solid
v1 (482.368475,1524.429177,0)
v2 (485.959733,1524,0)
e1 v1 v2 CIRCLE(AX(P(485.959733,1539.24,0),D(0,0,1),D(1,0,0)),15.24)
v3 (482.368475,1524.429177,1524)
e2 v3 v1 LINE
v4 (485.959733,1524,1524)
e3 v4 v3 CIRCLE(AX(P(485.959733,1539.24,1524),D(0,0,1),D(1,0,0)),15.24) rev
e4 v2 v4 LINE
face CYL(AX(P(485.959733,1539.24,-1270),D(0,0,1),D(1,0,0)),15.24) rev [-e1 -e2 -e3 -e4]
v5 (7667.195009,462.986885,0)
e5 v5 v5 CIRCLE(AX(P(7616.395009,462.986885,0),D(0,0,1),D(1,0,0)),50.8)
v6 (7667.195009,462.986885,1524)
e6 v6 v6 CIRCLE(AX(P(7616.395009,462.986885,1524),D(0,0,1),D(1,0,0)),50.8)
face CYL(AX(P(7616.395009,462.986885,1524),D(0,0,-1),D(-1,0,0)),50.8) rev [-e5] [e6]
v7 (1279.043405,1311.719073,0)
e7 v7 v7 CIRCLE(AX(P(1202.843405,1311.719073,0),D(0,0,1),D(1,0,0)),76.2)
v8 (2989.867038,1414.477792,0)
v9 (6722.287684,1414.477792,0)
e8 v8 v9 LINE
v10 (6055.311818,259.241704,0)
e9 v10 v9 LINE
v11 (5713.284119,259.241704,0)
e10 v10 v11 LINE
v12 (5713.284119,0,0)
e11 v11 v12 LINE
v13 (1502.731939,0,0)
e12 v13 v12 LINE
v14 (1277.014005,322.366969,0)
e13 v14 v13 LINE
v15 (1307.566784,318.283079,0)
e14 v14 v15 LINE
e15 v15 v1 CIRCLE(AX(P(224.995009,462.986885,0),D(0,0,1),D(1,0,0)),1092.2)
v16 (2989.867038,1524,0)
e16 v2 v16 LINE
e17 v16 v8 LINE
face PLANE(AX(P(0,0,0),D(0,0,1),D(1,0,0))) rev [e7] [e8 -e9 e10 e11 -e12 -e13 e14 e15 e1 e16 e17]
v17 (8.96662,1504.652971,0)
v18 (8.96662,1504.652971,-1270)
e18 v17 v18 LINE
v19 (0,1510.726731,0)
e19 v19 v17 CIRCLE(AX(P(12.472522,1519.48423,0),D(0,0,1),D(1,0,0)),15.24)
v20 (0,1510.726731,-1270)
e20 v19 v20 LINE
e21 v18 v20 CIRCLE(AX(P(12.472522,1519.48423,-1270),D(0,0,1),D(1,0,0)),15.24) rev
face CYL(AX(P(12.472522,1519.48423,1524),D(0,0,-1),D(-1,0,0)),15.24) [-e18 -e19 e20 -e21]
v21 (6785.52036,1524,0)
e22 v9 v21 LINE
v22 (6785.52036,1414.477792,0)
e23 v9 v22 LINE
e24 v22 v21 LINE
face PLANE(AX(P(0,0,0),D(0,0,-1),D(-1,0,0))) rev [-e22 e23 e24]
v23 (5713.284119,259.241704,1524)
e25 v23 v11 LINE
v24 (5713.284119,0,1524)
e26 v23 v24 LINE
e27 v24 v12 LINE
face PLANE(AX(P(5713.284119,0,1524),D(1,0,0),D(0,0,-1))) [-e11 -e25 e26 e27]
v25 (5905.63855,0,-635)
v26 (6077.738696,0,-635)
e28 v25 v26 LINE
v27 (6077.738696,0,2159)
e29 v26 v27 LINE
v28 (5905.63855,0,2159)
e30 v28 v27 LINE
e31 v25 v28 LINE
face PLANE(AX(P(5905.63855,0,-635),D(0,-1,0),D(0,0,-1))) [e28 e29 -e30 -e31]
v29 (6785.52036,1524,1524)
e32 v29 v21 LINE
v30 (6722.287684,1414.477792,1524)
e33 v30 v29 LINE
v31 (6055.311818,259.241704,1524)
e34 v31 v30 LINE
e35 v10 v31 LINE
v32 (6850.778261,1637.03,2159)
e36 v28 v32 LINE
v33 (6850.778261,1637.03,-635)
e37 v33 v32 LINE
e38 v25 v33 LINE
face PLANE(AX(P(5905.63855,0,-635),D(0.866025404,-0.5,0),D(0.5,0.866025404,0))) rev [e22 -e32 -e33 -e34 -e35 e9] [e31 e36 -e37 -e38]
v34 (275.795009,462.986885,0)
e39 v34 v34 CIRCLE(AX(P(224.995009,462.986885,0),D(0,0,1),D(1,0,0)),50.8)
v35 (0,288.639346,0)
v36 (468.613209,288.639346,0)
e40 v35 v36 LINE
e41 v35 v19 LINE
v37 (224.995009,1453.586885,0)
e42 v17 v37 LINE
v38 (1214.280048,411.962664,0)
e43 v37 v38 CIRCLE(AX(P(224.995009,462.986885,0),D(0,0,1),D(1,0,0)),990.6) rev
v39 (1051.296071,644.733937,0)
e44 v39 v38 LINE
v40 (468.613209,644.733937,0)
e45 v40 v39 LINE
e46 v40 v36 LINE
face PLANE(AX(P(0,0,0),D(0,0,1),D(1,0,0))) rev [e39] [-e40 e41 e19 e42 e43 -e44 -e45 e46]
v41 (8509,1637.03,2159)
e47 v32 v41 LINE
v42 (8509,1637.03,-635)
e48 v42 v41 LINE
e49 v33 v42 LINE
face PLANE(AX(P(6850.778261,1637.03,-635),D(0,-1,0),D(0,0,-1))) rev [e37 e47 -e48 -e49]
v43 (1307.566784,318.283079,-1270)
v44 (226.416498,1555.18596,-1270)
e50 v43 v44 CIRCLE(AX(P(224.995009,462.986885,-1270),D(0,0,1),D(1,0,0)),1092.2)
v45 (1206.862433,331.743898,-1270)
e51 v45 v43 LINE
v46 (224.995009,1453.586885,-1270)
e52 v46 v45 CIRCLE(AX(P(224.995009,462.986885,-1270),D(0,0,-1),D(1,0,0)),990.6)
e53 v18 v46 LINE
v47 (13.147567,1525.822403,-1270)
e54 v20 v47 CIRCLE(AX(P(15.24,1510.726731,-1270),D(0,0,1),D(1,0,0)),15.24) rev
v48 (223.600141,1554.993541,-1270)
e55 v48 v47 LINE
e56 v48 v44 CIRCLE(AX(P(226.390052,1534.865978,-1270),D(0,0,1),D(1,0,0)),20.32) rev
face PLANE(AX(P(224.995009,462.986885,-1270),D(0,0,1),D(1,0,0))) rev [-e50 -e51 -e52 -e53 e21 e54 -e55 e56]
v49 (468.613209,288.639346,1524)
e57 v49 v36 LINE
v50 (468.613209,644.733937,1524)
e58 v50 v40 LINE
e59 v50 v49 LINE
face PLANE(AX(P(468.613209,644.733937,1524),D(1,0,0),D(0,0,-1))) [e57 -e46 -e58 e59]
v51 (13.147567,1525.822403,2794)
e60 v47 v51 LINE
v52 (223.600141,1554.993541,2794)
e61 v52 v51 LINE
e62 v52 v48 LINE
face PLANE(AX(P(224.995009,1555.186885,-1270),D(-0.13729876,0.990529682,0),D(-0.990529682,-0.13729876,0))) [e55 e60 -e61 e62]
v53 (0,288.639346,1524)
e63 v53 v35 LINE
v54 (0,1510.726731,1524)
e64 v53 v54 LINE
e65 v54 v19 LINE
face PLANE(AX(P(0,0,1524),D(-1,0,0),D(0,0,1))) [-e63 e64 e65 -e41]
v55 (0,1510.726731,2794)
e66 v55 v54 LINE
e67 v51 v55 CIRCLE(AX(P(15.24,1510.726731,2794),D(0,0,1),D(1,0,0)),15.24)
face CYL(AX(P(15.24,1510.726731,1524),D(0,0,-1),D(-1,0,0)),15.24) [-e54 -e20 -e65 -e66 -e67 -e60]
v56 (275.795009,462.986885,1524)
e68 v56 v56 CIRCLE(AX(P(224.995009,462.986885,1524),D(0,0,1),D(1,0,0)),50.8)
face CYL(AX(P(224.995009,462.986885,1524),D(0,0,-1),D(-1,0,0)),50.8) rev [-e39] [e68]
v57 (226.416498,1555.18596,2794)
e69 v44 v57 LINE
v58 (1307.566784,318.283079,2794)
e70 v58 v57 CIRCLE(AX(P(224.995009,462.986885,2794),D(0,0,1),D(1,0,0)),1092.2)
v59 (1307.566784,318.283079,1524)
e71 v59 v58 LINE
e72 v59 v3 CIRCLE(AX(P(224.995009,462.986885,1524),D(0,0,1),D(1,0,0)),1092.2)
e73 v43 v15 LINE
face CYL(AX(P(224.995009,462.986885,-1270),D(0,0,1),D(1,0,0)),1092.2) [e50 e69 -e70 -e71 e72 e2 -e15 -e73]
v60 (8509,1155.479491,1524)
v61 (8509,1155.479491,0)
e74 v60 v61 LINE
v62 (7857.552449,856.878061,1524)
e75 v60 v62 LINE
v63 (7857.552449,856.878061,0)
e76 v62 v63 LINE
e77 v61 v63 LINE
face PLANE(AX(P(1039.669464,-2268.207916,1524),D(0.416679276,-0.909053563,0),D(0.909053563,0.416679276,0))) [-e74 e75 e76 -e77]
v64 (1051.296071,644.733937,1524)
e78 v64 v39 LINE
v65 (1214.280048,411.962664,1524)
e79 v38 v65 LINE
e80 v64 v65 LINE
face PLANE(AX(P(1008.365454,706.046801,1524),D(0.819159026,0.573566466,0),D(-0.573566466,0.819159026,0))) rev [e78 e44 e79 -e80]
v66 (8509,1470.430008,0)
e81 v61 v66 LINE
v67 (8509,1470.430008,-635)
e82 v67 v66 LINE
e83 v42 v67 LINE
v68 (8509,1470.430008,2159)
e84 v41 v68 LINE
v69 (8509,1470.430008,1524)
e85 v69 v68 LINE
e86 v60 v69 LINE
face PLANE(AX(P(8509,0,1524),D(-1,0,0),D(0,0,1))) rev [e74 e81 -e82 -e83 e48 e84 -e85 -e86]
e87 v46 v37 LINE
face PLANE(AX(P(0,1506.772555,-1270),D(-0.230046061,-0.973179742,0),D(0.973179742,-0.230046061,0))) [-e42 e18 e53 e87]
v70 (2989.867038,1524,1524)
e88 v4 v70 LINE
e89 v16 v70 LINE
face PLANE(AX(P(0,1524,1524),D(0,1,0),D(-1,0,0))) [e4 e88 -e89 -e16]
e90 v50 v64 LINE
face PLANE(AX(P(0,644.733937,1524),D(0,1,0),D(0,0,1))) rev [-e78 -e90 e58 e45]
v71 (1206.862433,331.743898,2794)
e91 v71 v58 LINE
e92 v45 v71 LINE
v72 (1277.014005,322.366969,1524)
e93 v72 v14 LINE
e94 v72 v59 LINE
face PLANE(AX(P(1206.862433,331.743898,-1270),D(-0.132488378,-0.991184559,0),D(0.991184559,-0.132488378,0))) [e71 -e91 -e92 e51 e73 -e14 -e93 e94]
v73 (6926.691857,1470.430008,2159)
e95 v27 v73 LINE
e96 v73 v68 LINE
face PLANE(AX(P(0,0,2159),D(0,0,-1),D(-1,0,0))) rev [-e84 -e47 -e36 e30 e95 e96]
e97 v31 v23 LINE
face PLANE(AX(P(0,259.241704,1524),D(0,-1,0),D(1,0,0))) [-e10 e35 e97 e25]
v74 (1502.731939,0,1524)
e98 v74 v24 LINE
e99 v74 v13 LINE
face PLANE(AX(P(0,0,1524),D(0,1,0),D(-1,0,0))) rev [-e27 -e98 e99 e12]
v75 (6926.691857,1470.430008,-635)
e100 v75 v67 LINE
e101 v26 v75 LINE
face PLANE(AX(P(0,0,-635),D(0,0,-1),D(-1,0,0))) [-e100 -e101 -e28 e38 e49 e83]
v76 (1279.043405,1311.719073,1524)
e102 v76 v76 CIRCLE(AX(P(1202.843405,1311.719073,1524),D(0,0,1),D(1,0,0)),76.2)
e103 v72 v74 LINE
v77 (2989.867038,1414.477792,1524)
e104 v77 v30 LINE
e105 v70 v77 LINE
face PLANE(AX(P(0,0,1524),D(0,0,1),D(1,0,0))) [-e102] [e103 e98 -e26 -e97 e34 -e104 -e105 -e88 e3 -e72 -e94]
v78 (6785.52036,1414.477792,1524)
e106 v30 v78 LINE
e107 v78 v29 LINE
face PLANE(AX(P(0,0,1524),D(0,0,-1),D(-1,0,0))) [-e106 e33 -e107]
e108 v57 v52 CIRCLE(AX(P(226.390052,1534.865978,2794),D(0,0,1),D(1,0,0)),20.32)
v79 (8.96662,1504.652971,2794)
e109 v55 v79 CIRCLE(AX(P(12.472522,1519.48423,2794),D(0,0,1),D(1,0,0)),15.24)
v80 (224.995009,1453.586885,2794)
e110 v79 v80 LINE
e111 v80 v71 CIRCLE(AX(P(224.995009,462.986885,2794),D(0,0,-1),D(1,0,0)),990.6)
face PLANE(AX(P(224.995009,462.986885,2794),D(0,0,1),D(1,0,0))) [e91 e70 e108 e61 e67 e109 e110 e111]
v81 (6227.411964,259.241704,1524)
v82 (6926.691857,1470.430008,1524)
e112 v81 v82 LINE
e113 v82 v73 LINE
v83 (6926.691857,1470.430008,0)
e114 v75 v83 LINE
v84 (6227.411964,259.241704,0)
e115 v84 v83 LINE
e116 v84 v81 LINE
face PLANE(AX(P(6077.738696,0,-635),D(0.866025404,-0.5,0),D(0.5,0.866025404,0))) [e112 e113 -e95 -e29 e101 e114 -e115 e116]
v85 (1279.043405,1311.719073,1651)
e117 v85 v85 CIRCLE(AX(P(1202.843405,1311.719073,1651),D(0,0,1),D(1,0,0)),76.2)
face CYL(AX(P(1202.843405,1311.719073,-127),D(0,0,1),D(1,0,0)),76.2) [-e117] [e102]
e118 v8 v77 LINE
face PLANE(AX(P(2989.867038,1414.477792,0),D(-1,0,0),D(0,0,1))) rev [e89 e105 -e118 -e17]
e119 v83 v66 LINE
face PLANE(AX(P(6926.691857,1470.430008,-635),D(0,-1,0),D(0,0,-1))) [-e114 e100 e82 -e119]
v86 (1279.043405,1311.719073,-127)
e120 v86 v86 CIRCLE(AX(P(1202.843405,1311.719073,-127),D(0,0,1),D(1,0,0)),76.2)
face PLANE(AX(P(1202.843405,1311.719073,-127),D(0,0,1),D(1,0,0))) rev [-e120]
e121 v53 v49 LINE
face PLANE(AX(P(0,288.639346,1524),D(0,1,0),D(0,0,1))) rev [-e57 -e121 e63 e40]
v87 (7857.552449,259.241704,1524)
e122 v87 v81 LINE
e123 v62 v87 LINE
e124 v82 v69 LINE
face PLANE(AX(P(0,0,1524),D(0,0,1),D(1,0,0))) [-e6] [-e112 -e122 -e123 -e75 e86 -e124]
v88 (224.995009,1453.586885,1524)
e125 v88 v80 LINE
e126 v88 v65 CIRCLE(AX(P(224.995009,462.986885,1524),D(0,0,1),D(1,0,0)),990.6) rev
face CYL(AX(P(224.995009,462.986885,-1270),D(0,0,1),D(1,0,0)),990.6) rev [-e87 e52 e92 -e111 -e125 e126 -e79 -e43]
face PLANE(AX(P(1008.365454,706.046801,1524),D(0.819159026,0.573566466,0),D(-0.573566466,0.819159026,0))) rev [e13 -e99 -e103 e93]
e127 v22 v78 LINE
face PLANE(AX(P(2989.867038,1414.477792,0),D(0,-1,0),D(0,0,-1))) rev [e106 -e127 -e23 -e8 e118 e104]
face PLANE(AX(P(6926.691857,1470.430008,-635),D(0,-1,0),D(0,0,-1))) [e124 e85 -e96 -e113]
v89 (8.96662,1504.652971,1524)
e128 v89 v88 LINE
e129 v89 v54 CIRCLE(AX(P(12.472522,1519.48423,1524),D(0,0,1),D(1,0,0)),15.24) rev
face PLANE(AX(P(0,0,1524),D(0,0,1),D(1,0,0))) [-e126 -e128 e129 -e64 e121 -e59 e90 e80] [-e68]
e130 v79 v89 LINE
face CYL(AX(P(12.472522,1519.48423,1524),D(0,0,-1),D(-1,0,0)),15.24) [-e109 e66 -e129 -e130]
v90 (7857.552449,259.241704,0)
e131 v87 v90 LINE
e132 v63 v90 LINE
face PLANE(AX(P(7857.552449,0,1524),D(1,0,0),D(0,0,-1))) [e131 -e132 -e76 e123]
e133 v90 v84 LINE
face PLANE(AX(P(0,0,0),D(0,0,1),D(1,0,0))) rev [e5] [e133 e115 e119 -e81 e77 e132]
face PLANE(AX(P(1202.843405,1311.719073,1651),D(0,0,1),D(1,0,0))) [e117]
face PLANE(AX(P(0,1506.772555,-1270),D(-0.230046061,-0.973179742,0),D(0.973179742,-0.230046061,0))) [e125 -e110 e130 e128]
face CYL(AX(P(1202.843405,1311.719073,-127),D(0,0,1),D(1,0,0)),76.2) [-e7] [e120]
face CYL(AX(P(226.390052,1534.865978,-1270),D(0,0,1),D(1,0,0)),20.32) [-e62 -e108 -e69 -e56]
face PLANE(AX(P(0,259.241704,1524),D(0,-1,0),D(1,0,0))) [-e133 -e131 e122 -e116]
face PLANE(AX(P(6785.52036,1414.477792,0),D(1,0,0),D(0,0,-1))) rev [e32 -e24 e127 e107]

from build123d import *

# Parameters (mm, degrees)
SKETCH1_R                = 50.8
BOSS_EXTRUDE1_DEPTH      = 1524
BOSS_EXTRUDE2_DEPTH      = 1270
BOSS_EXTRUDE2_DEPTH_BACK = 2794
BOSS_EXTRUDE3_DEPTH      = 635
BOSS_EXTRUDE3_DEPTH_BACK = 2159
BOSS_EXTRUDE5_DEPTH      = 127
BOSS_EXTRUDE5_DEPTH_BACK = 1651
SKETCH5_R                = 76.2
BOSS_EXTRUDE6_DEPTH      = 4064
BOSS_EXTRUDE7_START      = -4064
BOSS_EXTRUDE7_DEPTH      = 4064
FILLET1_R                = 20.32
FILLET2_R                = 15.24
FILLET3_R                = 15.24
FILLET4_R                = 15.24
FILLET5_R                = 15.24
SKETCH4_W                = 3795.653322381
SKETCH4_H                = 109.522208094
CUT_EXTRUDE1_DEPTH       = 1524


with BuildPart() as part:
    # Sketch1 → Boss-Extrude1 (new body)
    with BuildSketch(Plane.XY):
        Polygon((0, 288.639346487), (468.613209277, 288.639346487), (468.613209277, 644.7339374), (1051.2960708, 644.7339374), (1178.553429838, 462.986885422), (1502.731938743, 0), (5713.284119233, 0), (5713.284119233, 259.241704477), (7857.552449038, 259.241704477), (7857.552449038, 856.878061068), (8509, 1155.479490671), (8509, 1524), (0, 1524), align=None)
        with Locations((224.995009204, 462.986885422)):
            Circle(SKETCH1_R, mode=Mode.SUBTRACT)
        with Locations((7616.395009204, 462.986885422)):
            Circle(SKETCH1_R, mode=Mode.SUBTRACT)
    extrude(amount=BOSS_EXTRUDE1_DEPTH)

    # Sketch2 → Boss-Extrude2 (add, two sides: drawn at the far end of the back side and taken through both)
    with BuildSketch(Plane.XY.offset(1524).offset(-BOSS_EXTRUDE2_DEPTH_BACK)):
        with BuildLine():
            Line((1206.862433225, 331.743898385), (1307.566784406, 318.283079202))
            ThreePointArc((1307.566784406, 318.283079202), (1046.86675624, 1182.311340326), (224.995009204, 1555.186885422))
            Line((224.995009204, 1555.186885422), (224.995009204, 1453.586885422))
            ThreePointArc((224.995009204, 1453.586885422), (970.413570469, 1115.397437544), (1206.862433225, 331.743898385))
        make_face()
    extrude(amount=BOSS_EXTRUDE2_DEPTH + BOSS_EXTRUDE2_DEPTH_BACK)

    # Sketch3 → Boss-Extrude3 (add, two sides: drawn at the far end of the back side and taken through both)
    with BuildSketch(Plane.XY.offset(1524).offset(-BOSS_EXTRUDE3_DEPTH_BACK)):
        Polygon((5905.638550103, 0), (6850.778261275, 1637.03), (8509, 1637.03), (8509, 1470.430007997), (6926.6918571, 1470.430007997), (6077.738696158, 0), align=None)
    extrude(amount=BOSS_EXTRUDE3_DEPTH + BOSS_EXTRUDE3_DEPTH_BACK)

    # Sketch5 → Boss-Extrude5 (add, two sides: drawn at the far end of the back side and taken through both)
    with BuildSketch(Plane.XY.offset(1524).offset(-BOSS_EXTRUDE5_DEPTH_BACK)):
        with Locations((1202.84340516, 1311.719073043)):
            Circle(SKETCH5_R)
    extrude(amount=BOSS_EXTRUDE5_DEPTH + BOSS_EXTRUDE5_DEPTH_BACK)

    # Sketch7 → Boss-Extrude6 (add, through all)
    with BuildSketch(Plane.XY.offset(2794)):
        Polygon((224.995009204, 1555.186885422), (0, 1524), (224.995009204, 1524), align=None)
    extrude(amount=-BOSS_EXTRUDE6_DEPTH)

    # Sketch8 → Boss-Extrude7 (add)
    with BuildSketch(Plane.XY.offset(2794).offset(BOSS_EXTRUDE7_START)):
        Polygon((0, 1506.772554526), (224.995009204, 1453.586885422), (224.995009204, 1524), (0, 1524), align=None)
    extrude(amount=BOSS_EXTRUDE7_DEPTH)

    # Fillet1
    fillet1_edges = [part.edges().sort_by_distance(p)[0] for p in [
        (224.995009204, 1555.186885422, 762),
    ]]
    fillet(fillet1_edges, radius=FILLET1_R)

    # Fillet2
    fillet2_edges = [part.edges().sort_by_distance(p)[0] for p in [
        (0, 1524, 762),
    ]]
    fillet(fillet2_edges, radius=FILLET2_R)

    # Fillet3
    fillet3_edges = [part.edges().sort_by_distance(p)[0] for p in [
        (484.132059225, 1524, 762),
    ]]
    fillet(fillet3_edges, radius=FILLET3_R)

    # Fillet4
    # the kernel refuses this fillet: 15.24 mm, written as the material it takes off along each edge
    with BuildSketch(Plane(origin=(0, 1506.772554526, 1524), x_dir=(0.9731797416711222, -0.23004606147667025, 0), z_dir=(0, 0, 1))) as fillet4_piece_1:
        with BuildLine():
            CenterArc((9.213734751, 15.24), FILLET4_R, 228.374143348, 41.625856652)
            Line((-0.909642728, 3.848124456), (-1.112110278, 3.620286945))
            ThreePointArc((-1.112110278, 3.620286945), (-0.751446549, 1.853944188), (-0.296625185, -0.07011804))
            Line((-0.296625185, -0.07011804), (0, -0.3048))
            Line((0, -0.3048), (9.213734751, -0.3048))
            Line((9.213734751, -0.3048), (9.213734751, 0))
        make_face()
    extrude(amount=1293.034336878, mode=Mode.SUBTRACT)

    # Fillet5
    # the kernel refuses this fillet: 15.24 mm, written as the material it takes off along each edge
    with BuildSketch(Plane(origin=(0, 1506.772554526, -1293.034336878), x_dir=(0.9731797416711221, -0.23004606147667092, 0), z_dir=(0, 0, 1))) as fillet5_piece_1:
        with BuildLine():
            CenterArc((9.213734751, 15.24), FILLET5_R, 228.374143348, 41.625856652)
            Line((-0.909642728, 3.848124456), (-1.112110278, 3.620286945))
            ThreePointArc((-1.112110278, 3.620286945), (-0.751446549, 1.853944188), (-0.296625185, -0.07011804))
            Line((-0.296625185, -0.07011804), (0, -0.3048))
            Line((0, -0.3048), (9.213734751, -0.3048))
            Line((9.213734751, -0.3048), (9.213734751, 0))
        make_face()
    extrude(amount=1293.034336878, mode=Mode.SUBTRACT)

    # Sketch4 → Cut-Extrude1 (cut)
    with BuildSketch(Plane.XY.offset(1524)):
        with Locations((4887.693699158, 1469.238895953)):
            Rectangle(SKETCH4_W, SKETCH4_H)
    extrude(amount=-CUT_EXTRUDE1_DEPTH, mode=Mode.SUBTRACT)


solid = part.part
